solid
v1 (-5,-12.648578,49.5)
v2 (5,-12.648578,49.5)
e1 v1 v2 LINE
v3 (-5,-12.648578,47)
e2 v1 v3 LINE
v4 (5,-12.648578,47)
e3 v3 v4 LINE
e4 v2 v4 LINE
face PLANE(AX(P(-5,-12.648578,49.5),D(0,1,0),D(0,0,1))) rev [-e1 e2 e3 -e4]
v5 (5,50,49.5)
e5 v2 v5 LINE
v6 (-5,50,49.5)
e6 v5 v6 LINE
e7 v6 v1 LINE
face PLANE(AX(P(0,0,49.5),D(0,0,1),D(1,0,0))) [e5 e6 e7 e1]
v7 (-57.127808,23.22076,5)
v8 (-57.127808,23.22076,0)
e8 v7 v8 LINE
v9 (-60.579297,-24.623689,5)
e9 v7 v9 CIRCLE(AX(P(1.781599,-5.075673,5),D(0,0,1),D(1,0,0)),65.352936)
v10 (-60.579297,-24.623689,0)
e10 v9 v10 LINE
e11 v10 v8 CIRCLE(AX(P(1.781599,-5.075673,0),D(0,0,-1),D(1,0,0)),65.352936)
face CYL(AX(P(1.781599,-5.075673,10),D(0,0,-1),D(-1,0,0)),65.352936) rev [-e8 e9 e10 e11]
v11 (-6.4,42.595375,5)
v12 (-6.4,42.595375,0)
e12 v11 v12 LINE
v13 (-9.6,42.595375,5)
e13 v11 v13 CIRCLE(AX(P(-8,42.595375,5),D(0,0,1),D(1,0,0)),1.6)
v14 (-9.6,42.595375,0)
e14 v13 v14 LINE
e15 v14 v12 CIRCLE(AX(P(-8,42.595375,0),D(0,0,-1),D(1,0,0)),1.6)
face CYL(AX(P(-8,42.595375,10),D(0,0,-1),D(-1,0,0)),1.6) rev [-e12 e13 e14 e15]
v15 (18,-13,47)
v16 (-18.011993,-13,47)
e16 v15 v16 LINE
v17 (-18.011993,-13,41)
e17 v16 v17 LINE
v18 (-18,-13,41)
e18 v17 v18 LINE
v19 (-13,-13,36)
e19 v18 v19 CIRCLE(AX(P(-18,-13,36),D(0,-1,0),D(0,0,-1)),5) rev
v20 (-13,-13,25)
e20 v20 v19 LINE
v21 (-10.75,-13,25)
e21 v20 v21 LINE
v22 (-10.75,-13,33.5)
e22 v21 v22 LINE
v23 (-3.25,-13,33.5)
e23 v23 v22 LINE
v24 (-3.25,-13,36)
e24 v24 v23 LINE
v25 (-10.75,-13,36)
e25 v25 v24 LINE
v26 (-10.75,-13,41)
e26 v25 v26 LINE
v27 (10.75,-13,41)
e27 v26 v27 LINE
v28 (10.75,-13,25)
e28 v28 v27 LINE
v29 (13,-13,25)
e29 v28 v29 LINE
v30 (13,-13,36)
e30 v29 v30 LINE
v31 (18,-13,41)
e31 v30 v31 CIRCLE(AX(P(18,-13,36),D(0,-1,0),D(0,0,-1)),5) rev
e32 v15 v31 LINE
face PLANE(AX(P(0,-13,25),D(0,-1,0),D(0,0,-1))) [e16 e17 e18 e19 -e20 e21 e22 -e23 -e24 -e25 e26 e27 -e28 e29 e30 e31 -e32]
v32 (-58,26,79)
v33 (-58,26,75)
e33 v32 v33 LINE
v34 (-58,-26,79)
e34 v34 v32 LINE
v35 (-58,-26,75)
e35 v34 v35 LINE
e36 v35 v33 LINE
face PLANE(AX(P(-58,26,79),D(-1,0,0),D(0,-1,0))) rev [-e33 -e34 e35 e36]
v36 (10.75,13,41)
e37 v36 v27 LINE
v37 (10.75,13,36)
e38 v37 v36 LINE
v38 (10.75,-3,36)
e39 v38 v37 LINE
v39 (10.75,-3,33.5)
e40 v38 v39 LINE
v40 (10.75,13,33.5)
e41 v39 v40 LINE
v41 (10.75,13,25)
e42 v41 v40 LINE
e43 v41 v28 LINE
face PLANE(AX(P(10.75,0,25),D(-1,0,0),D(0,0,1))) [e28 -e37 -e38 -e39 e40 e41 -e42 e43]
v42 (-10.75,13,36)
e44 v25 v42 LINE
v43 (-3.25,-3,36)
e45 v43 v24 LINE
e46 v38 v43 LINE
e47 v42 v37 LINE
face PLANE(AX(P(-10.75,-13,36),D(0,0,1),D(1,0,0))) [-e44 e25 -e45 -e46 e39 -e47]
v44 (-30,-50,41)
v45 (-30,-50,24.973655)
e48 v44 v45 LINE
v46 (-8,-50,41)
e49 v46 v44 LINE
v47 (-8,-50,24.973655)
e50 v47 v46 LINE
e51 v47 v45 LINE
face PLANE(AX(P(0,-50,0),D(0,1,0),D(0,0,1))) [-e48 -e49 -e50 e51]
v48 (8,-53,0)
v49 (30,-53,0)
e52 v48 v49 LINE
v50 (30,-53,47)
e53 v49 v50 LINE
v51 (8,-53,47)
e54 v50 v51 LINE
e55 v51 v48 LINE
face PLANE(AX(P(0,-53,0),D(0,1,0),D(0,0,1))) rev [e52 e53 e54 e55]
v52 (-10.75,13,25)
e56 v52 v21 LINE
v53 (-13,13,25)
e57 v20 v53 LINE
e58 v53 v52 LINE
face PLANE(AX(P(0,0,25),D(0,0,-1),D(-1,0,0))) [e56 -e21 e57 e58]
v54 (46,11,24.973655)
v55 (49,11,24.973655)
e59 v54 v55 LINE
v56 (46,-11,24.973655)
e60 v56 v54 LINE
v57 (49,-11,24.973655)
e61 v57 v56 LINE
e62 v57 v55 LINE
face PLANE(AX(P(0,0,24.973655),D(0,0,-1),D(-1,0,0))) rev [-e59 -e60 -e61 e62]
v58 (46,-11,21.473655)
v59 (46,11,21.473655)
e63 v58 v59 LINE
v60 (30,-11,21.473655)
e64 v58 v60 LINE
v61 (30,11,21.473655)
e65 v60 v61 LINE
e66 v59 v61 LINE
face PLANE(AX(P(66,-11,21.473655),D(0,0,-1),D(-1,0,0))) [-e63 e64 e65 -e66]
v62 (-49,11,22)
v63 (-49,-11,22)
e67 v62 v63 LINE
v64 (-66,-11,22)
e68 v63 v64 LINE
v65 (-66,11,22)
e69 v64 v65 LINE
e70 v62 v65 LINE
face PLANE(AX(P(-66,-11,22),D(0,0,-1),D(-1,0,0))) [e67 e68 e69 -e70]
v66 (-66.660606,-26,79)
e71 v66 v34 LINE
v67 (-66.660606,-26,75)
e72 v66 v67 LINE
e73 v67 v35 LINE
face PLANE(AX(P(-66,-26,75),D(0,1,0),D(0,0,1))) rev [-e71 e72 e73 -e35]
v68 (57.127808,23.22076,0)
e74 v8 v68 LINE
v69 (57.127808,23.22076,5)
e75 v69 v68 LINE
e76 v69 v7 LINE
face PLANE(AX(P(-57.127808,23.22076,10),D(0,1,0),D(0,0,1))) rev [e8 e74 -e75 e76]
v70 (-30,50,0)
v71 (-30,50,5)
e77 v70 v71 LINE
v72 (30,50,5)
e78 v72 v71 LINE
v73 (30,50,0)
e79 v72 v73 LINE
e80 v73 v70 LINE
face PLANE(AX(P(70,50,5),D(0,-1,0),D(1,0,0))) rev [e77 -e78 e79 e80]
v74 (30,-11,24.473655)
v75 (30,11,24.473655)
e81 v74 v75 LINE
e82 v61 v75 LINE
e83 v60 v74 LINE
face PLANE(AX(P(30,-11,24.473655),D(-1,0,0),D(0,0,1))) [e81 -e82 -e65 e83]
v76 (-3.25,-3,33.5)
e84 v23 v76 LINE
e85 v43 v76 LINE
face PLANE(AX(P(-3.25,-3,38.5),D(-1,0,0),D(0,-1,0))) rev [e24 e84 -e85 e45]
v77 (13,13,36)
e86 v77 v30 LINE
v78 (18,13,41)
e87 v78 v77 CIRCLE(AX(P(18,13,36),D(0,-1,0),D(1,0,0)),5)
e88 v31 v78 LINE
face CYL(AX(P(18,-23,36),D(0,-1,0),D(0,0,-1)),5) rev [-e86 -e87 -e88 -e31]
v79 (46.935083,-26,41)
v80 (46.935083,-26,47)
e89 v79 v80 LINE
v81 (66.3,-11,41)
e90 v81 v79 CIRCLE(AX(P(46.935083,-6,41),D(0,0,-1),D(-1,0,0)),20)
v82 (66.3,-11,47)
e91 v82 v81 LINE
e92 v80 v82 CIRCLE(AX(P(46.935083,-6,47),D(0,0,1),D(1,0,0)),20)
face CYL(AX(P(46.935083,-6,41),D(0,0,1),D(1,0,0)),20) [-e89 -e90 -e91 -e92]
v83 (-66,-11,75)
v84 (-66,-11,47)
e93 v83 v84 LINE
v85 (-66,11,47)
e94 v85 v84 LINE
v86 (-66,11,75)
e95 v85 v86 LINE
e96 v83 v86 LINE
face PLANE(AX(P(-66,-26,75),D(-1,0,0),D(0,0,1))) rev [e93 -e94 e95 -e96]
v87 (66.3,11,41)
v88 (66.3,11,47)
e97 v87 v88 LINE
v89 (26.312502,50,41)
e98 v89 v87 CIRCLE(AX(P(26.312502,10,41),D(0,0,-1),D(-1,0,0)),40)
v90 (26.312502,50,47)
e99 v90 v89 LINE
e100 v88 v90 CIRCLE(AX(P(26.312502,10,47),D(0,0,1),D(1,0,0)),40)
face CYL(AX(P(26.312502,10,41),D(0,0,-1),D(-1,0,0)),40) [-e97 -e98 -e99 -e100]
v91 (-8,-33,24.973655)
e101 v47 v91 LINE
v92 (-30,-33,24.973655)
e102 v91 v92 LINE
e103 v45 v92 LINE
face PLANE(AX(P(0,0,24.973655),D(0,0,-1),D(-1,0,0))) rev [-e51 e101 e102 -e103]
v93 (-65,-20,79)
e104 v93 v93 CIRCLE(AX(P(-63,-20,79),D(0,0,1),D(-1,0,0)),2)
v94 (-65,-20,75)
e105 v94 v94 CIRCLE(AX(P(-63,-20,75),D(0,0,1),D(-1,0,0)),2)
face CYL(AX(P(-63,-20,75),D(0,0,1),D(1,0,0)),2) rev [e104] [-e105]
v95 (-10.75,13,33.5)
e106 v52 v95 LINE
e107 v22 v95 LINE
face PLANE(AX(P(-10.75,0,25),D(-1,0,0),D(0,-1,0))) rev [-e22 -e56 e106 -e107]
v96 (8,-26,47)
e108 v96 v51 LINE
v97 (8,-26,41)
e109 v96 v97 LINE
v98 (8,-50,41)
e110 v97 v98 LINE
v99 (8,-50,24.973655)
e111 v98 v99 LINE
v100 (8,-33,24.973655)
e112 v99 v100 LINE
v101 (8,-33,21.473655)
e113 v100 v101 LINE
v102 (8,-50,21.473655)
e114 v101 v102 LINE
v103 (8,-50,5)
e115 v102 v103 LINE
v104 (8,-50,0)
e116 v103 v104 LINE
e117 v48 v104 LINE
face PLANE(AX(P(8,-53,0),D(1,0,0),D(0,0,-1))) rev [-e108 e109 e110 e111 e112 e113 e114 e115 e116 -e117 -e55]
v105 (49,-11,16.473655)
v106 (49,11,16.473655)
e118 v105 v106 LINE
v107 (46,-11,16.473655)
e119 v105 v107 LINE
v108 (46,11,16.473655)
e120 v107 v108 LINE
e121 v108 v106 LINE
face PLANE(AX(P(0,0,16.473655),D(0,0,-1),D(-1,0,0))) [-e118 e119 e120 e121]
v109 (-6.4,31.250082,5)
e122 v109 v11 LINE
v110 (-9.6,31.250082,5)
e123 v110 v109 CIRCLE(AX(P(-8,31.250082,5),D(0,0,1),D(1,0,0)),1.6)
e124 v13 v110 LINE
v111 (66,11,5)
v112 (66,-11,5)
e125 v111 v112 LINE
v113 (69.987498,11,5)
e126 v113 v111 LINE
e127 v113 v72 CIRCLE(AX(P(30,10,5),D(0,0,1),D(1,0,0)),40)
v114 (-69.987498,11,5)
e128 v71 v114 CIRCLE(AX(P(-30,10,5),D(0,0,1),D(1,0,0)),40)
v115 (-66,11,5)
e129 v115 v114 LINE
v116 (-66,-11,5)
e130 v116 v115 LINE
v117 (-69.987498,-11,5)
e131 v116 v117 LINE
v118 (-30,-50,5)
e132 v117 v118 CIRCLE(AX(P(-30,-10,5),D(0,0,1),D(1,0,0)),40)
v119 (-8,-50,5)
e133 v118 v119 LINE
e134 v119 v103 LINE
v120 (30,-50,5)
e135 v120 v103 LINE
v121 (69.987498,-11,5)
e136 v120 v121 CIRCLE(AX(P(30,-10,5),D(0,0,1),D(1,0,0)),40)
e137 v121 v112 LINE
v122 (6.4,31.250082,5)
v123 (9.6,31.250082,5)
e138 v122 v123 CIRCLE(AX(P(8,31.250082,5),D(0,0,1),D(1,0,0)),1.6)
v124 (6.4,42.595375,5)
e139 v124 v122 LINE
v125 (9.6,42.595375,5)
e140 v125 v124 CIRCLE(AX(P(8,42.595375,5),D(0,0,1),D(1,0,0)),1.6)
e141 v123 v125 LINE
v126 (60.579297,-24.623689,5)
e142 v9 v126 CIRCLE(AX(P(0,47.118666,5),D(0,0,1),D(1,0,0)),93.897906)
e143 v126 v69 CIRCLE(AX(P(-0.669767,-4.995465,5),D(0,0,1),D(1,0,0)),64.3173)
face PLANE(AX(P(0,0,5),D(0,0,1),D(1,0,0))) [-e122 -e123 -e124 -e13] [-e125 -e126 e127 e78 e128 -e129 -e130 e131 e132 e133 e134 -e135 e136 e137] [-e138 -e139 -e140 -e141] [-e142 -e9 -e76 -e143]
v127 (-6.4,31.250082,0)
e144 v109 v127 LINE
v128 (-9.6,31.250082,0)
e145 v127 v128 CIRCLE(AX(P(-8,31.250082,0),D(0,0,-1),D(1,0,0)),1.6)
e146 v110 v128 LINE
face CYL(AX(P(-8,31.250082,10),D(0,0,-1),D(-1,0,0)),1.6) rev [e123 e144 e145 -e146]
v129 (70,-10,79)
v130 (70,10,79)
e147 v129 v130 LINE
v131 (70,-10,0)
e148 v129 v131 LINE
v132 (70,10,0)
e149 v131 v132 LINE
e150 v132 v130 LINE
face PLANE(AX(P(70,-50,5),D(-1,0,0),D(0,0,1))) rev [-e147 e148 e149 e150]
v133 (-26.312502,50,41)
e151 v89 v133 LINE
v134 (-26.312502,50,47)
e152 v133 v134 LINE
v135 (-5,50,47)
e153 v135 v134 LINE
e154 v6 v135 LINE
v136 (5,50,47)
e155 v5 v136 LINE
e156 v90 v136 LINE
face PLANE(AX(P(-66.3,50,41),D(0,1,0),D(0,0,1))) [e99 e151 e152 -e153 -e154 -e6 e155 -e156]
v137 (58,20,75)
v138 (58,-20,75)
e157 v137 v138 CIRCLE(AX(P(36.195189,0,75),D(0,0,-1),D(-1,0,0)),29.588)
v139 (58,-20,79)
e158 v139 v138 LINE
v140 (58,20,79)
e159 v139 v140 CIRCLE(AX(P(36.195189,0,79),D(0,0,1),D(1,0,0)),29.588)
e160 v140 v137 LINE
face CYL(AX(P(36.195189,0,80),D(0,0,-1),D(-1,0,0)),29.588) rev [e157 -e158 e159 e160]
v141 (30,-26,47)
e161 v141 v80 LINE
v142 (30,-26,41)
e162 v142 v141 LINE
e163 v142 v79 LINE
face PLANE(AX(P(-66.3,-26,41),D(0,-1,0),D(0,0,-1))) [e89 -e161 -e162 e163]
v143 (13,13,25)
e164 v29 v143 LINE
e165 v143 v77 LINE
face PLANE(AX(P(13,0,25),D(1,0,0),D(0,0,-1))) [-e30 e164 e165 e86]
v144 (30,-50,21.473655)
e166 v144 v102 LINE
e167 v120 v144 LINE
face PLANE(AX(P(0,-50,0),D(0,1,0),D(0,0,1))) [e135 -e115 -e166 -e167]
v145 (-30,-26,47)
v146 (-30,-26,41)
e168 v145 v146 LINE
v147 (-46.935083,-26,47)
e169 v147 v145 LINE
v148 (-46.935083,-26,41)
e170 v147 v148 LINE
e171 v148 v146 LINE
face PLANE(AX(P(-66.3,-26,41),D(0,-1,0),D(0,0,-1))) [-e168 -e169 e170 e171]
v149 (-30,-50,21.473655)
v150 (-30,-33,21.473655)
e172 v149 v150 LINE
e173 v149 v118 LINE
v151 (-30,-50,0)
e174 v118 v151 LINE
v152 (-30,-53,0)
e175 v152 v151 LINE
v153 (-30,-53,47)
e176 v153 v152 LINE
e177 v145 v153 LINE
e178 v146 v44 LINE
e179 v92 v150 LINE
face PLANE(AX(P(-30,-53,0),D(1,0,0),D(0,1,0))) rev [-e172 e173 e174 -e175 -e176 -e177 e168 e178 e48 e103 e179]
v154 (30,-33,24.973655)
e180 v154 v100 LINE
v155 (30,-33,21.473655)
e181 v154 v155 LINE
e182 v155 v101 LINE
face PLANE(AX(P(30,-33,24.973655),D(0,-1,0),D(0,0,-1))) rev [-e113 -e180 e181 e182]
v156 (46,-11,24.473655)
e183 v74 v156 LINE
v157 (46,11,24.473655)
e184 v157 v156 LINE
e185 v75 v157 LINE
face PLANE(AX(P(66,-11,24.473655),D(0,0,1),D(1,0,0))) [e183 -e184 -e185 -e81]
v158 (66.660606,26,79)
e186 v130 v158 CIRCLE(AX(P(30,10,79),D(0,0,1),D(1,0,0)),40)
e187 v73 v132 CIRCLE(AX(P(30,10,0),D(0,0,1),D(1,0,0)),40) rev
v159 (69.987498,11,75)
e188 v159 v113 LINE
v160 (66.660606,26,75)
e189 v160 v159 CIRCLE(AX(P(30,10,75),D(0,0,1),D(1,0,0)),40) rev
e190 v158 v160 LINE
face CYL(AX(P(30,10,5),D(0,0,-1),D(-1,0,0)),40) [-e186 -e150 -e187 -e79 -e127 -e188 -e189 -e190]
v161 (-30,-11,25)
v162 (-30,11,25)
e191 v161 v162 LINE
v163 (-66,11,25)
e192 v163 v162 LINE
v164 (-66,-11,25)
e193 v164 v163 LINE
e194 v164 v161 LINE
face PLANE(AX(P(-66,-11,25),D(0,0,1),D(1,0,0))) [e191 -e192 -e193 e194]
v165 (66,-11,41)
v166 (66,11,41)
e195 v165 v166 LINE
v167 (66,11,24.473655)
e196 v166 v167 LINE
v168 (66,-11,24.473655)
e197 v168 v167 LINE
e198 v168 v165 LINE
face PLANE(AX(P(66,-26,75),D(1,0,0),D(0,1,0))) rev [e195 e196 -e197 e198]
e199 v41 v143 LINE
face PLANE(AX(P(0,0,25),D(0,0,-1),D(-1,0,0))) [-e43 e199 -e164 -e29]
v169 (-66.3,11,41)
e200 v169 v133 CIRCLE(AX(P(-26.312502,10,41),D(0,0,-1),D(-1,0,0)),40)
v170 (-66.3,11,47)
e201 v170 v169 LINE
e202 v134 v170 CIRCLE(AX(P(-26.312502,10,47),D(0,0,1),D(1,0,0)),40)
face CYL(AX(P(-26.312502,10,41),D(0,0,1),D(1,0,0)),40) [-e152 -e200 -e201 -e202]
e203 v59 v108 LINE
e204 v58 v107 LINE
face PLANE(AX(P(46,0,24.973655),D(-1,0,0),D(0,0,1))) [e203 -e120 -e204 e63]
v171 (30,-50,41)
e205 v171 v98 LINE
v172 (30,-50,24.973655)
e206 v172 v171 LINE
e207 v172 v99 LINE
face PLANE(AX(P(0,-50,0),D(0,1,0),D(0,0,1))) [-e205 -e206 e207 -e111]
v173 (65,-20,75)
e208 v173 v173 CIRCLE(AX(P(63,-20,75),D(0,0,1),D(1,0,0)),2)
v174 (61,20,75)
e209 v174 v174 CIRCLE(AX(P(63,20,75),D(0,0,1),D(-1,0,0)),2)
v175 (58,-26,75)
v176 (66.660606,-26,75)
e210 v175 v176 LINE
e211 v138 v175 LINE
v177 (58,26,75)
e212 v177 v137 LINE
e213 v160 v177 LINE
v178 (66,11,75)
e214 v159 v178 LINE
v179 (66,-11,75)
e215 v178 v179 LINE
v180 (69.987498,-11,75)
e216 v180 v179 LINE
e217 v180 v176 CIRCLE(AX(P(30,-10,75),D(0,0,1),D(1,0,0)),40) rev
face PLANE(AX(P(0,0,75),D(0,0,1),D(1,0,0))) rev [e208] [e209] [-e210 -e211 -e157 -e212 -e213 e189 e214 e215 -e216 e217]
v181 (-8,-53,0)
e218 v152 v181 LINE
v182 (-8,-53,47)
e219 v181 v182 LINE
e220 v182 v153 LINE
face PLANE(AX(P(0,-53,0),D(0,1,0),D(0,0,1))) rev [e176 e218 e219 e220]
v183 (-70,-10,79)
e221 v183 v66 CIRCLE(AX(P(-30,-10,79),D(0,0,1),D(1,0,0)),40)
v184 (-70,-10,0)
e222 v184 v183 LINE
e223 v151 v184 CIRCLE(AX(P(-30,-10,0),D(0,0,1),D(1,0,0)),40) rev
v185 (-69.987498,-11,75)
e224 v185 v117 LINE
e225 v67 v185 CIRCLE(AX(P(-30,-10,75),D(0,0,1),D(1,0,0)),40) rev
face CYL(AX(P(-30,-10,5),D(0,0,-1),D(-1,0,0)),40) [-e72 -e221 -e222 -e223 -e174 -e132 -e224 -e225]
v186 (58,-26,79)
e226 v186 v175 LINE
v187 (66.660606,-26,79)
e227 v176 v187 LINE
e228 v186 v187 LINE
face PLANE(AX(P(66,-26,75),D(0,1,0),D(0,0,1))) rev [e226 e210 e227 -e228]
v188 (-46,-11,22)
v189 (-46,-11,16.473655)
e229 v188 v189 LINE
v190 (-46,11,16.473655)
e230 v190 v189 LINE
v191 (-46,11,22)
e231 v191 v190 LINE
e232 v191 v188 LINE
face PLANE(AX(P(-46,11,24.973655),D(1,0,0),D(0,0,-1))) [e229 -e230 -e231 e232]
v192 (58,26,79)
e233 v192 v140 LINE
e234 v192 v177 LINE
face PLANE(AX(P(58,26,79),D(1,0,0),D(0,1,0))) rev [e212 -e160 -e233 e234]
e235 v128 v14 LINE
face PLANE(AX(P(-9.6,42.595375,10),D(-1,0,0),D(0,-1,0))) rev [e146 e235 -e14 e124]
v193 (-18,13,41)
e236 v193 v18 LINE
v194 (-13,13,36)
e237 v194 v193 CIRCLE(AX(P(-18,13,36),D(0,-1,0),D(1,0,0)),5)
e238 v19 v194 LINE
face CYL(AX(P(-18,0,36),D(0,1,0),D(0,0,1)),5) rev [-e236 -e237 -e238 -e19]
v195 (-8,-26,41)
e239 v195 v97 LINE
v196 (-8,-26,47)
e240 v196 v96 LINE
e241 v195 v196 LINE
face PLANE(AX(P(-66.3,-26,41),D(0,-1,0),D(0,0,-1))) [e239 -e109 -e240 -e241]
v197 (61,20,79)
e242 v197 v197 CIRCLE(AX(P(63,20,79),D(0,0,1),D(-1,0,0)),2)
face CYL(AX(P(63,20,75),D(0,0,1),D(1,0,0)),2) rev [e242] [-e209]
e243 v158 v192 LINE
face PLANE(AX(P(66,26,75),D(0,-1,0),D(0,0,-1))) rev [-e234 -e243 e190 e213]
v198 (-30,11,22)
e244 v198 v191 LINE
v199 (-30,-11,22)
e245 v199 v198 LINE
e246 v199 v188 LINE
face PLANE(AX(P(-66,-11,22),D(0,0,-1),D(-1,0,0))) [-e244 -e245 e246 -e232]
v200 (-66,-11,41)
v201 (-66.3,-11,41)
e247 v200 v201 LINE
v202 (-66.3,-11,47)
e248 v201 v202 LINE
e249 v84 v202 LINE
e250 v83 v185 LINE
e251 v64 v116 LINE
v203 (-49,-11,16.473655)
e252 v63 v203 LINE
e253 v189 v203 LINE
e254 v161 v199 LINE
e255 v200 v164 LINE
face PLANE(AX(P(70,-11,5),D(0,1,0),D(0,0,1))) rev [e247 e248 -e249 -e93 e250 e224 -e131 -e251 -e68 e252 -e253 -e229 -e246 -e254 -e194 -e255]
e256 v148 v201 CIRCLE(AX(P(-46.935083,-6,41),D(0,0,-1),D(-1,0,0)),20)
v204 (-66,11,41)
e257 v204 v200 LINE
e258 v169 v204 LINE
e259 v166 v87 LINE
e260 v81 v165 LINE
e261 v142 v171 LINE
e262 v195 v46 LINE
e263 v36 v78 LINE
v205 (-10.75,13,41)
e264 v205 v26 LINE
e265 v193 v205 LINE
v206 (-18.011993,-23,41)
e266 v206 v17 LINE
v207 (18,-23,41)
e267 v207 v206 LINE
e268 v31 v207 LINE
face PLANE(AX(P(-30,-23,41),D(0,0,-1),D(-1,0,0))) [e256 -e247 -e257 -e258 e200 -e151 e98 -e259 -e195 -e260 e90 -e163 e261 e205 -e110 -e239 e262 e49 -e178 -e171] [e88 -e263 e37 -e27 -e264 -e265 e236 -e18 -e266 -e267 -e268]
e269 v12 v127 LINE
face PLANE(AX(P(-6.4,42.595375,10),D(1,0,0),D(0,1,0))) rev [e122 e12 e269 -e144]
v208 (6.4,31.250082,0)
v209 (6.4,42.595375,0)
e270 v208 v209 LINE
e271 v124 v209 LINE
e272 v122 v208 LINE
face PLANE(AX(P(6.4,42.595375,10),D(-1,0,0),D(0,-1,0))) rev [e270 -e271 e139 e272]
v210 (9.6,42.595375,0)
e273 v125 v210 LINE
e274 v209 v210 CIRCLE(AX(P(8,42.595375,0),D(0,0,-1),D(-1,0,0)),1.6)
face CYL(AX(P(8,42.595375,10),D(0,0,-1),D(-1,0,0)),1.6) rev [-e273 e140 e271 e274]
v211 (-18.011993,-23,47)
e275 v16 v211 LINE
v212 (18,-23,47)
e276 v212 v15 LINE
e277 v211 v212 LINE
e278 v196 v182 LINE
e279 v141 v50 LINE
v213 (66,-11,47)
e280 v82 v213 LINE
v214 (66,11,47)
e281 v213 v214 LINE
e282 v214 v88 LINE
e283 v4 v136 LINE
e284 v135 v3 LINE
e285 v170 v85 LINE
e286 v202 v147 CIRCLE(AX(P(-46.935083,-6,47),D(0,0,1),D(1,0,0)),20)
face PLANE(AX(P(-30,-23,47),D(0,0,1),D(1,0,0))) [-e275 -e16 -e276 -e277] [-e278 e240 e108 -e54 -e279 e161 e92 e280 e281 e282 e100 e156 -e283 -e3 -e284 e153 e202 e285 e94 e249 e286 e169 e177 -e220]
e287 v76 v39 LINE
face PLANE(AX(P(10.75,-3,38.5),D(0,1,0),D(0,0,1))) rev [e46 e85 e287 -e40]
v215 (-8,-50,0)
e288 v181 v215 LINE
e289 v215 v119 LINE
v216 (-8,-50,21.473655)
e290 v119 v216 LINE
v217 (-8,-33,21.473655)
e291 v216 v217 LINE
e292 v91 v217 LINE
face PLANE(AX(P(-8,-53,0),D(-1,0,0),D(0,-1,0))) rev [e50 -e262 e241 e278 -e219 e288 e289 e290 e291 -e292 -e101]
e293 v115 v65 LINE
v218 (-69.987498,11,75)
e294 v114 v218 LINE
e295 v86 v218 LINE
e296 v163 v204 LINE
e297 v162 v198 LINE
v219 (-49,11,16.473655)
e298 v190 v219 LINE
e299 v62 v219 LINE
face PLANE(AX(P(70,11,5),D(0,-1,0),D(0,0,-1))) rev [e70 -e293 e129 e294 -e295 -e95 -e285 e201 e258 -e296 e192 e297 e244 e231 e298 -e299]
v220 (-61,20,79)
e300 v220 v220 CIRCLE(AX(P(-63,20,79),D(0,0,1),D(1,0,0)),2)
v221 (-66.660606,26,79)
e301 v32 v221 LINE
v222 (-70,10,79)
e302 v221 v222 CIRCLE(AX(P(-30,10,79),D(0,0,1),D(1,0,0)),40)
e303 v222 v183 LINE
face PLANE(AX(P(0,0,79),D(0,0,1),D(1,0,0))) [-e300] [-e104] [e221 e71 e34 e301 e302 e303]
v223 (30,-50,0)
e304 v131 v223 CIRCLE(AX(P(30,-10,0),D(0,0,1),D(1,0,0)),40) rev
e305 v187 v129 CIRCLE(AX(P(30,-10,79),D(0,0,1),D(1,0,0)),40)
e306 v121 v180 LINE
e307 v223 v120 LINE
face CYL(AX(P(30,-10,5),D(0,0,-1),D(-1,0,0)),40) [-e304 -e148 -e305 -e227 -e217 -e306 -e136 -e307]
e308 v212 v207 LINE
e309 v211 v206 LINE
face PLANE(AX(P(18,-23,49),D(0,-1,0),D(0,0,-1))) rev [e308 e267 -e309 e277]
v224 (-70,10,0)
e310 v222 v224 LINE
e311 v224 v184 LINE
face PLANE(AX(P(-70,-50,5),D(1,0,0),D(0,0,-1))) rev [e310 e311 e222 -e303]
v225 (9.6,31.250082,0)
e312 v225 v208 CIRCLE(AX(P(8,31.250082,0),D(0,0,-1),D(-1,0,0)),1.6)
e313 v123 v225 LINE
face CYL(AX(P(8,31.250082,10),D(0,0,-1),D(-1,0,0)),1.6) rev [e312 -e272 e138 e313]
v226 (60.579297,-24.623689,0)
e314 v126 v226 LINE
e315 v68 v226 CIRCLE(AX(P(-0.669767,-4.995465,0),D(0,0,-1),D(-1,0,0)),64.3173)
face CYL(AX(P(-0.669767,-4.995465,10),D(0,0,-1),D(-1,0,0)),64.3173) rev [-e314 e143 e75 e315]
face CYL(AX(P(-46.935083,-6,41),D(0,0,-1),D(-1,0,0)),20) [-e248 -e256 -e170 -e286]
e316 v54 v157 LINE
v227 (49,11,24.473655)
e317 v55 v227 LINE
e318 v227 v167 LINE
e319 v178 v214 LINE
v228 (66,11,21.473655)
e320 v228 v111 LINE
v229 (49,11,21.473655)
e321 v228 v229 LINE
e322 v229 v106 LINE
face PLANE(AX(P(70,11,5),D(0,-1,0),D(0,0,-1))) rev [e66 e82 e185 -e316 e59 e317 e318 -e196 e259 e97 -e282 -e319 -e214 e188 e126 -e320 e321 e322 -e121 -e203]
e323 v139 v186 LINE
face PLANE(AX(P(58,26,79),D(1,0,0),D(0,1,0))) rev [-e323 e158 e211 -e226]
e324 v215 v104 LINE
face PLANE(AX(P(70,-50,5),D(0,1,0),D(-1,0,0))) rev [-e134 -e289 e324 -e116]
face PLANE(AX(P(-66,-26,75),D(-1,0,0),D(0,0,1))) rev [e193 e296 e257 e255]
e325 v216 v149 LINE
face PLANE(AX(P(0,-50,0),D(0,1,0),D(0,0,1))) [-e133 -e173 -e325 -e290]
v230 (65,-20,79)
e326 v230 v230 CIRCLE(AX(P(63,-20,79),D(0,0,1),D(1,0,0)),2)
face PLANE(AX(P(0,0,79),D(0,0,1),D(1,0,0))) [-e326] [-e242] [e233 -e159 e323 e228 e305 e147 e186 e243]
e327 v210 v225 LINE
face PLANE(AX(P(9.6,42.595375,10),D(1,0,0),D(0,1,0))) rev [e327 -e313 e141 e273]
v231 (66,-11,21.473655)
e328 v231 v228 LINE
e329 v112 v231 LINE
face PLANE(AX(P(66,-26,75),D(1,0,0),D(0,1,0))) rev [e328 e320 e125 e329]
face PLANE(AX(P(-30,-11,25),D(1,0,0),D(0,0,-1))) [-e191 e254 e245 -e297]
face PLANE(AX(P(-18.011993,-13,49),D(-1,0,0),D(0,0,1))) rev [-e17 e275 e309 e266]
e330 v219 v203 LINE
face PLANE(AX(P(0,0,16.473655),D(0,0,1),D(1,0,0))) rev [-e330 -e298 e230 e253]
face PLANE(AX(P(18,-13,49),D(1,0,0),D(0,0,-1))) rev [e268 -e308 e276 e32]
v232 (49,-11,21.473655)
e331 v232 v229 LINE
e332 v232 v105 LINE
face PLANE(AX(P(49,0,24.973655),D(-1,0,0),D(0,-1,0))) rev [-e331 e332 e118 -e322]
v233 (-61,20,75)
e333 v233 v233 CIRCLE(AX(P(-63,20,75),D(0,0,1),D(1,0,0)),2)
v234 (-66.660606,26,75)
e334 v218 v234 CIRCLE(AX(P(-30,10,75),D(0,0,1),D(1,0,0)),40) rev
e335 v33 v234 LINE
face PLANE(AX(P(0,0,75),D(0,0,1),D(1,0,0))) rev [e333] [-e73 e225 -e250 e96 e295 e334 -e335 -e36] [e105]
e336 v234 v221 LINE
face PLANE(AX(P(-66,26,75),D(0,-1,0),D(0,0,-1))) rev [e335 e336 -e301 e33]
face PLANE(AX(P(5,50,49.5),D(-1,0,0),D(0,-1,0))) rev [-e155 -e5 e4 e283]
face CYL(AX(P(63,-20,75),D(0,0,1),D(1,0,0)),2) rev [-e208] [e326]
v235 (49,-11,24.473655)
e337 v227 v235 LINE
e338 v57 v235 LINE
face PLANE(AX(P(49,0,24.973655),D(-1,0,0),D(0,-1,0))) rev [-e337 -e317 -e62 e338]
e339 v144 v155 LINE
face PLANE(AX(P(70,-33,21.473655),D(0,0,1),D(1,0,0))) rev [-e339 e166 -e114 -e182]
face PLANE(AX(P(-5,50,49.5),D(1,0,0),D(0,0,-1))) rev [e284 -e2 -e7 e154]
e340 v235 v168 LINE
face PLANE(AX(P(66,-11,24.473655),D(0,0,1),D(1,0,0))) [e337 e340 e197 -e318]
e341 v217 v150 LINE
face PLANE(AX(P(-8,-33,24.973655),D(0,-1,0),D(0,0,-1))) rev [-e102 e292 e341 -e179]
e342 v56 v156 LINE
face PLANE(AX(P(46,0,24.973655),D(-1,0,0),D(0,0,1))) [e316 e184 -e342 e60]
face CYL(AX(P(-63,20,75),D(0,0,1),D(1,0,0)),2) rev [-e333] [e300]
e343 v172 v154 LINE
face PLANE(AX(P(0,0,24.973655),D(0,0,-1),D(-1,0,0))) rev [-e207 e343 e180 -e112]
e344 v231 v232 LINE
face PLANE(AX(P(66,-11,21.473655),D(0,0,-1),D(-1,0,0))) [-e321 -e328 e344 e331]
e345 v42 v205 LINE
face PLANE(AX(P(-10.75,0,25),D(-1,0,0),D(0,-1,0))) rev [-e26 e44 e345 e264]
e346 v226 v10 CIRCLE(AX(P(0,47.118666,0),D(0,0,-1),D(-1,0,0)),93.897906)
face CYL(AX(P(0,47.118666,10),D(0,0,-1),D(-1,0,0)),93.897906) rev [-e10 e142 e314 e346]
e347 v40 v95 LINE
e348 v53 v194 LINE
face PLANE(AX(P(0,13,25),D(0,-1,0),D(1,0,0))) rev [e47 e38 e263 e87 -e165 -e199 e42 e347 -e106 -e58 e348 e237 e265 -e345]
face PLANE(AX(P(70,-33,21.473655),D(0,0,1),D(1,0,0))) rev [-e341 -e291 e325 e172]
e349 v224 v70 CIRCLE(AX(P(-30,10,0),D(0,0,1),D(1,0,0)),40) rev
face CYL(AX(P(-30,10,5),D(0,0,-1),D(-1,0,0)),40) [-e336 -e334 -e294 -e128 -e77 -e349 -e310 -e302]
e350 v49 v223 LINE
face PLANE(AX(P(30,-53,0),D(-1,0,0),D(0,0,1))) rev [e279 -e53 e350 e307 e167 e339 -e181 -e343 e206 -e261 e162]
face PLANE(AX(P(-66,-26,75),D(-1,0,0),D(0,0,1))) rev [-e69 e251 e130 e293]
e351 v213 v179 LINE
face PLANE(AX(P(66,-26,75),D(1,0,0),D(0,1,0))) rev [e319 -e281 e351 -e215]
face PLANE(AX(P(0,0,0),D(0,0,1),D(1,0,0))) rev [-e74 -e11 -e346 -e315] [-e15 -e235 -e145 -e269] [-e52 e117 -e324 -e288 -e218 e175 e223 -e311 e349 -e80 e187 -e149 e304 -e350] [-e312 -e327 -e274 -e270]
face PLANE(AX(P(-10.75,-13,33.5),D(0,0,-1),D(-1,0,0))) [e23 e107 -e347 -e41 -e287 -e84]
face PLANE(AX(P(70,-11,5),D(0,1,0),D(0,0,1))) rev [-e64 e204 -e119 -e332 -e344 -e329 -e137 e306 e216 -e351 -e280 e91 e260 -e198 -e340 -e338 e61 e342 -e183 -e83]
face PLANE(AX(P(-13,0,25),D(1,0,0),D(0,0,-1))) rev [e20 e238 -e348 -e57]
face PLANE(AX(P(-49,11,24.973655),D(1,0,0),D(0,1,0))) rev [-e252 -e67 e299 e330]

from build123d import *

# Parameters (mm, degrees)
SKETCH1_W                 = 140
SKETCH1_H                 = 100
BOSS_EXTRUDE1_DEPTH       = 5
SKETCH2_W                 = 4
SKETCH2_H                 = 52
BOSS_EXTRUDE2_DEPTH       = 70
SKETCH3_W                 = 12
SKETCH3_H                 = 52
BOSS_EXTRUDE3_DEPTH       = 4
SKETCH4_R                 = 2
CUT_EXTRUDE1_DEPTH        = 4
SKETCH5_W                 = 70
SKETCH5_H                 = 15
CUT_EXTRUDE3_DEPTH        = 169.347854159
FILLET1_R                 = 40
CUT_EXTRUDE6_DEPTH        = 10
SKETCH11_W                = 22
SKETCH11_H                = 41
BOSS_EXTRUDE6_DEPTH       = 3
SKETCH12_W                = 22
SKETCH12_H                = 6
BOSS_EXTRUDE7_DEPTH       = 30
SKETCH15_W                = 132.6
SKETCH15_H                = 76
BOSS_EXTRUDE8_DEPTH       = 6
FILLET2_R                 = 40
FILLET3_R                 = 20
CUT_EXTRUDE13_DEPTH       = 10
SKETCH25_W                = 10
SKETCH25_H                = 62.648578198
BOSS_EXTRUDE9_DEPTH       = 2.5
BOSS_EXTRUDE10_DEPTH      = 16
SKETCH27_W                = 21.5
SKETCH27_H                = 2.5
BOSS_EXTRUDE11_DEPTH      = 26
FILLET4_R                 = 5
SKETCH29_W                = 14
SKETCH29_H                = 10
CUT_EXTRUDE14_DEPTH       = 5
CUT_EXTRUDE15_DEPTH       = 5
SKETCH33_W                = 36
SKETCH33_H                = 3
BOSS_EXTRUDE12_DEPTH      = 22
BOSS_EXTRUDE13_DEPTH      = 5
BOSS_EXTRUDE13_DEPTH_BACK = 3.5
SKETCH34_W                = 22
SKETCH34_H                = 17
SKETCH34_W_2              = 3
SKETCH34_H_2              = 22
SKETCH35_W                = 5
SKETCH35_H                = 17
CUT_EXTRUDE16_DEPTH       = 139.021737418
SKETCH36_W                = 36.01199305
SKETCH36_H                = 10
CUT_EXTRUDE17_DEPTH       = 8


with BuildPart() as part:
    # Sketch1 → Boss-Extrude1 (new body)
    with BuildSketch(Plane.XY):
        Rectangle(SKETCH1_W, SKETCH1_H)
    extrude(amount=BOSS_EXTRUDE1_DEPTH)

    # Sketch2 → Boss-Extrude2 (add)
    with BuildSketch(Plane.XY.offset(5)):
        with Locations((-68, 0)):
            Rectangle(SKETCH2_W, SKETCH2_H)
        with Locations((68, 0)):
            Rectangle(SKETCH2_W, SKETCH2_H)
    extrude(amount=BOSS_EXTRUDE2_DEPTH)

    # Sketch3 → Boss-Extrude3 (add)
    with BuildSketch(Plane.XY.offset(75)):
        with Locations((-64, 0)):
            Rectangle(SKETCH3_W, SKETCH3_H)
        with Locations((64, 0)):
            Rectangle(SKETCH3_W, SKETCH3_H)
    extrude(amount=BOSS_EXTRUDE3_DEPTH)

    # Sketch4 → Cut-Extrude1 (cut)
    with BuildSketch(Plane.XY.offset(79)):
        with Locations((-63, 20)):
            Circle(SKETCH4_R)
        with Locations(Location((-63, -20, 0), (0, 0, 180))):
            Circle(SKETCH4_R)
        with Locations(Location((63, 20, 0), (0, 0, 180))):
            Circle(SKETCH4_R)
        with Locations((63, -20)):
            Circle(SKETCH4_R)
    extrude(amount=-CUT_EXTRUDE1_DEPTH, mode=Mode.SUBTRACT)

    # Sketch5 → Cut-Extrude3 (cut, through all)
    with BuildSketch(Plane.ZY.offset(70)):
        with Locations((40, 18.5)):
            Rectangle(SKETCH5_W, SKETCH5_H)
        with Locations((40, -18.5)):
            Rectangle(SKETCH5_W, SKETCH5_H)
    extrude(amount=-CUT_EXTRUDE3_DEPTH, mode=Mode.SUBTRACT)

    # Fillet1
    fillet1_edges = [part.edges().sort_by_distance(p)[0] for p in [
        (70, -50, 2.5),
        (70, 50, 2.5),
        (-70, 50, 2.5),
        (-70, -50, 2.5),
    ]]
    fillet(fillet1_edges, radius=FILLET1_R)

    # Sketch9 → Cut-Extrude6 (cut)
    with BuildSketch(Plane(origin=(0, 0, 0), x_dir=(-1, 0, 0), z_dir=(0, 0, -1))):
        with BuildLine():
            Line((-6.4, 42.595375442), (-6.4, 31.250081589))
            ThreePointArc((-6.4, 31.250081589), (-8, 29.650081589), (-9.6, 31.250081589))
            Line((-9.6, 31.250081589), (-9.6, 42.595375442))
            ThreePointArc((-9.6, 42.595375442), (-8, 44.195375442), (-6.4, 42.595375442))
        make_face()
        with BuildLine():
            Line((6.4, 42.595375442), (6.4, 31.250081589))
            ThreePointArc((6.4, 31.250081589), (8, 29.650081589), (9.6, 31.250081589))
            Line((9.6, 31.250081589), (9.6, 42.595375442))
            ThreePointArc((9.6, 42.595375442), (8, 44.195375442), (6.4, 42.595375442))
        make_face()
    extrude(amount=-CUT_EXTRUDE6_DEPTH, mode=Mode.SUBTRACT)

    # Sketch11 → Boss-Extrude6 (add)
    with BuildSketch(Plane.XZ.offset(50)):
        with Locations((-19, 20.5)):
            Rectangle(SKETCH11_W, SKETCH11_H)
        with Locations((19, 20.5)):
            Rectangle(SKETCH11_W, SKETCH11_H)
    extrude(amount=BOSS_EXTRUDE6_DEPTH)

    # Sketch12 → Boss-Extrude7 (add)
    with BuildSketch(Plane.XZ.offset(53)):
        with Locations((-19, 44)):
            Rectangle(SKETCH12_W, SKETCH12_H)
        with Locations((19, 44)):
            Rectangle(SKETCH12_W, SKETCH12_H)
    extrude(amount=-BOSS_EXTRUDE7_DEPTH)

    # Sketch15 → Boss-Extrude8 (add)
    with BuildSketch(Plane.XY.offset(47)):
        with Locations((0, 12)):
            Rectangle(SKETCH15_W, SKETCH15_H)
    extrude(amount=-BOSS_EXTRUDE8_DEPTH)

    # Fillet2
    # the kernel refuses this fillet: 40 mm, written as the material it takes off along each edge
    with BuildSketch(Plane(origin=(66.3, 50, 146.968745116), x_dir=(0, -1, 0), z_dir=(0, 0, -1))) as fillet2_piece_1_section:
        with BuildLine():
            CenterArc((40, 39.987498046), FILLET2_R, 180, 88.567456262)
            Line((0, 39.987498046), (0, 0))
            Line((0, 0), (39, 0))
        make_face()
    fillet2_piece_1 = extrude(amount=105.968745116, mode=Mode.PRIVATE)
    fillet2_piece_1 = split(fillet2_piece_1, bisect_by=Plane(origin=(65.992272223, 15.649976228, 75), z_dir=(0, 0, -1)), keep=Keep.TOP, mode=Mode.PRIVATE)
    add(fillet2_piece_1, mode=Mode.SUBTRACT)
    with BuildSketch(Plane(origin=(-66.3, 50, 146.968745116), x_dir=(0, -1, 0), z_dir=(0, 0, -1))) as fillet2_piece_2_section:
        with BuildLine():
            CenterArc((40, -39.987498046), FILLET2_R, 91.432543738, 88.567456262)
            Line((0, -39.987498046), (0, 0))
            Line((0, 0), (39, 0))
        make_face()
    fillet2_piece_2 = extrude(amount=105.968745116, mode=Mode.PRIVATE)
    fillet2_piece_2 = split(fillet2_piece_2, bisect_by=Plane(origin=(-65.992272223, 15.649976228, 75), z_dir=(0, 0, -1)), keep=Keep.TOP, mode=Mode.PRIVATE)
    add(fillet2_piece_2, mode=Mode.SUBTRACT)

    # Fillet3
    # the kernel refuses this fillet: 20 mm, written as the material it takes off along each edge
    with BuildSketch(Plane(origin=(66.3, -26, 47), x_dir=(0, 1, 0), z_dir=(0, 0, -1))) as fillet3_piece_1_section:
        with BuildLine():
            CenterArc((20, -19.364916731), FILLET3_R, 104.477512186, 75.522487814)
            Line((0, -19.364916731), (0, 0))
            Line((0, 0), (15, 0))
        make_face()
    fillet3_piece_1 = extrude(amount=54.412291828, mode=Mode.PRIVATE)
    fillet3_piece_1 = split(fillet3_piece_1, bisect_by=Plane(origin=(64.996360144, -14.682849628, 5), z_dir=(0, 0, 1)), keep=Keep.TOP, mode=Mode.PRIVATE)
    add(fillet3_piece_1, mode=Mode.SUBTRACT)
    with BuildSketch(Plane(origin=(-66.3, -26, 47), x_dir=(1, 0, 0), z_dir=(0, 0, -1))) as fillet3_piece_2_section:
        with BuildLine():
            CenterArc((19.364916731, -20), FILLET3_R, 90, 75.522487814)
            Line((0, -15), (0, 0))
            Line((0, 0), (19.364916731, 0))
        make_face()
    fillet3_piece_2 = extrude(amount=54.412291828, mode=Mode.PRIVATE)
    fillet3_piece_2 = split(fillet3_piece_2, bisect_by=Plane(origin=(-52.725602454, -25.185189276, 5), z_dir=(0, 0, 1)), keep=Keep.TOP, mode=Mode.PRIVATE)
    add(fillet3_piece_2, mode=Mode.SUBTRACT)

    # Sketch24 → Cut-Extrude13 (cut)
    with BuildSketch(Plane(origin=(0, 0, 0), x_dir=(-1, 0, 0), z_dir=(0, 0, -1))):
        with BuildLine():
            Line((57.127807538, 23.220760353), (-57.127807538, 23.220760353))
            ThreePointArc((-57.127807538, 23.220760353), (-63.480824357, -0.367653581), (-60.579297228, -24.623688601))
            ThreePointArc((-60.579297228, -24.623688601), (0, -46.779239647), (60.579297228, -24.623688601))
            ThreePointArc((60.579297228, -24.623688601), (63.401945013, -0.373343922), (57.127807538, 23.220760353))
        make_face()
    extrude(amount=-CUT_EXTRUDE13_DEPTH, mode=Mode.SUBTRACT)

    # Sketch25 → Boss-Extrude9 (add)
    with BuildSketch(Plane.XY.offset(47)):
        with Locations((0, 18.675710901)):
            Rectangle(SKETCH25_W, SKETCH25_H)
    extrude(amount=BOSS_EXTRUDE9_DEPTH)

    # Sketch26 → Boss-Extrude10 (add)
    with BuildSketch(Plane(origin=(0, 0, 41), x_dir=(-1, 0, 0), z_dir=(0, 0, -1))):
        Polygon((-10.75, -13), (-10.75, -11), (-10.75, 11), (-10.75, 13), (-13, 13), (-13, -13), align=None)
        Polygon((10.75, 11), (10.75, -11), (10.75, -13), (13, -13), (13, 13), (10.75, 13), align=None)
    extrude(amount=BOSS_EXTRUDE10_DEPTH)

    # Sketch27 → Boss-Extrude11 (add)
    with BuildSketch(Plane(origin=(0, 13, 0), x_dir=(1, 0, 0), z_dir=(0, 1, 0))):
        with Locations((0, -34.75)):
            Rectangle(SKETCH27_W, SKETCH27_H)
    extrude(amount=-BOSS_EXTRUDE11_DEPTH)

    # Fillet4
    fillet4_edges = [part.edges().sort_by_distance(p)[0] for p in [
        (13, 0, 41),
        (-13, 0, 41),
    ]]
    fillet(fillet4_edges, radius=FILLET4_R)

    # Sketch29 → Cut-Extrude14 (cut)
    with BuildSketch(Plane(origin=(0, 0, 33.5), x_dir=(-1, 0, 0), z_dir=(0, 0, -1))):
        with Locations((-3.75, -8)):
            Rectangle(SKETCH29_W, SKETCH29_H)
    extrude(amount=-CUT_EXTRUDE14_DEPTH, mode=Mode.SUBTRACT)

    # Sketch30 → Cut-Extrude15 (cut)
    with BuildSketch(Plane(origin=(0, 0, 75), x_dir=(-1, 0, 0), z_dir=(0, 0, -1))):
        with BuildLine():
            Line((-58, 20), (-58, -20))
            ThreePointArc((-58, -20), (-65.783189716, 0), (-58, 20))
        make_face()
    extrude(amount=-CUT_EXTRUDE15_DEPTH, mode=Mode.SUBTRACT)

    # Sketch33 → Boss-Extrude12 (add)
    with BuildSketch(Plane(origin=(0, 11, 0), x_dir=(1, 0, 0), z_dir=(0, 1, 0))):
        with Locations((-48, -23.5)):
            Rectangle(SKETCH33_W, SKETCH33_H)
        with Locations((48, -22.973655472)):
            Rectangle(SKETCH33_W, SKETCH33_H)
    extrude(amount=-BOSS_EXTRUDE12_DEPTH)

    # Sketch34 → Boss-Extrude13 (add, two sides: drawn at the far end of the back side and taken through both)
    with BuildSketch(Plane(origin=(0, 0, 21.473655472), x_dir=(-1, 0, 0), z_dir=(0, 0, -1)).offset(-BOSS_EXTRUDE13_DEPTH_BACK)):
        with Locations((19, -41.5)):
            Rectangle(SKETCH34_W, SKETCH34_H)
        with Locations((47.5, 0)):
            Rectangle(SKETCH34_W_2, SKETCH34_H_2)
        with Locations((-19, -41.5)):
            Rectangle(SKETCH34_W, SKETCH34_H)
        with Locations((-47.5, 0)):
            Rectangle(SKETCH34_W_2, SKETCH34_H_2)
    extrude(amount=BOSS_EXTRUDE13_DEPTH + BOSS_EXTRUDE13_DEPTH_BACK)

    # Sketch35 → Cut-Extrude16 (cut, through all)
    with BuildSketch(Plane.ZY.offset(30)):
        with Locations((18.973655472, -41.5)):
            Rectangle(SKETCH35_W, SKETCH35_H)
    extrude(amount=-CUT_EXTRUDE16_DEPTH, mode=Mode.SUBTRACT)

    # Sketch36 → Cut-Extrude17 (cut)
    with BuildSketch(Plane(origin=(0, 0, 41), x_dir=(-1, 0, 0), z_dir=(0, 0, -1))):
        with Locations((0.005996525, -18)):
            Rectangle(SKETCH36_W, SKETCH36_H)
    extrude(amount=-CUT_EXTRUDE17_DEPTH, mode=Mode.SUBTRACT)


solid = part.part
